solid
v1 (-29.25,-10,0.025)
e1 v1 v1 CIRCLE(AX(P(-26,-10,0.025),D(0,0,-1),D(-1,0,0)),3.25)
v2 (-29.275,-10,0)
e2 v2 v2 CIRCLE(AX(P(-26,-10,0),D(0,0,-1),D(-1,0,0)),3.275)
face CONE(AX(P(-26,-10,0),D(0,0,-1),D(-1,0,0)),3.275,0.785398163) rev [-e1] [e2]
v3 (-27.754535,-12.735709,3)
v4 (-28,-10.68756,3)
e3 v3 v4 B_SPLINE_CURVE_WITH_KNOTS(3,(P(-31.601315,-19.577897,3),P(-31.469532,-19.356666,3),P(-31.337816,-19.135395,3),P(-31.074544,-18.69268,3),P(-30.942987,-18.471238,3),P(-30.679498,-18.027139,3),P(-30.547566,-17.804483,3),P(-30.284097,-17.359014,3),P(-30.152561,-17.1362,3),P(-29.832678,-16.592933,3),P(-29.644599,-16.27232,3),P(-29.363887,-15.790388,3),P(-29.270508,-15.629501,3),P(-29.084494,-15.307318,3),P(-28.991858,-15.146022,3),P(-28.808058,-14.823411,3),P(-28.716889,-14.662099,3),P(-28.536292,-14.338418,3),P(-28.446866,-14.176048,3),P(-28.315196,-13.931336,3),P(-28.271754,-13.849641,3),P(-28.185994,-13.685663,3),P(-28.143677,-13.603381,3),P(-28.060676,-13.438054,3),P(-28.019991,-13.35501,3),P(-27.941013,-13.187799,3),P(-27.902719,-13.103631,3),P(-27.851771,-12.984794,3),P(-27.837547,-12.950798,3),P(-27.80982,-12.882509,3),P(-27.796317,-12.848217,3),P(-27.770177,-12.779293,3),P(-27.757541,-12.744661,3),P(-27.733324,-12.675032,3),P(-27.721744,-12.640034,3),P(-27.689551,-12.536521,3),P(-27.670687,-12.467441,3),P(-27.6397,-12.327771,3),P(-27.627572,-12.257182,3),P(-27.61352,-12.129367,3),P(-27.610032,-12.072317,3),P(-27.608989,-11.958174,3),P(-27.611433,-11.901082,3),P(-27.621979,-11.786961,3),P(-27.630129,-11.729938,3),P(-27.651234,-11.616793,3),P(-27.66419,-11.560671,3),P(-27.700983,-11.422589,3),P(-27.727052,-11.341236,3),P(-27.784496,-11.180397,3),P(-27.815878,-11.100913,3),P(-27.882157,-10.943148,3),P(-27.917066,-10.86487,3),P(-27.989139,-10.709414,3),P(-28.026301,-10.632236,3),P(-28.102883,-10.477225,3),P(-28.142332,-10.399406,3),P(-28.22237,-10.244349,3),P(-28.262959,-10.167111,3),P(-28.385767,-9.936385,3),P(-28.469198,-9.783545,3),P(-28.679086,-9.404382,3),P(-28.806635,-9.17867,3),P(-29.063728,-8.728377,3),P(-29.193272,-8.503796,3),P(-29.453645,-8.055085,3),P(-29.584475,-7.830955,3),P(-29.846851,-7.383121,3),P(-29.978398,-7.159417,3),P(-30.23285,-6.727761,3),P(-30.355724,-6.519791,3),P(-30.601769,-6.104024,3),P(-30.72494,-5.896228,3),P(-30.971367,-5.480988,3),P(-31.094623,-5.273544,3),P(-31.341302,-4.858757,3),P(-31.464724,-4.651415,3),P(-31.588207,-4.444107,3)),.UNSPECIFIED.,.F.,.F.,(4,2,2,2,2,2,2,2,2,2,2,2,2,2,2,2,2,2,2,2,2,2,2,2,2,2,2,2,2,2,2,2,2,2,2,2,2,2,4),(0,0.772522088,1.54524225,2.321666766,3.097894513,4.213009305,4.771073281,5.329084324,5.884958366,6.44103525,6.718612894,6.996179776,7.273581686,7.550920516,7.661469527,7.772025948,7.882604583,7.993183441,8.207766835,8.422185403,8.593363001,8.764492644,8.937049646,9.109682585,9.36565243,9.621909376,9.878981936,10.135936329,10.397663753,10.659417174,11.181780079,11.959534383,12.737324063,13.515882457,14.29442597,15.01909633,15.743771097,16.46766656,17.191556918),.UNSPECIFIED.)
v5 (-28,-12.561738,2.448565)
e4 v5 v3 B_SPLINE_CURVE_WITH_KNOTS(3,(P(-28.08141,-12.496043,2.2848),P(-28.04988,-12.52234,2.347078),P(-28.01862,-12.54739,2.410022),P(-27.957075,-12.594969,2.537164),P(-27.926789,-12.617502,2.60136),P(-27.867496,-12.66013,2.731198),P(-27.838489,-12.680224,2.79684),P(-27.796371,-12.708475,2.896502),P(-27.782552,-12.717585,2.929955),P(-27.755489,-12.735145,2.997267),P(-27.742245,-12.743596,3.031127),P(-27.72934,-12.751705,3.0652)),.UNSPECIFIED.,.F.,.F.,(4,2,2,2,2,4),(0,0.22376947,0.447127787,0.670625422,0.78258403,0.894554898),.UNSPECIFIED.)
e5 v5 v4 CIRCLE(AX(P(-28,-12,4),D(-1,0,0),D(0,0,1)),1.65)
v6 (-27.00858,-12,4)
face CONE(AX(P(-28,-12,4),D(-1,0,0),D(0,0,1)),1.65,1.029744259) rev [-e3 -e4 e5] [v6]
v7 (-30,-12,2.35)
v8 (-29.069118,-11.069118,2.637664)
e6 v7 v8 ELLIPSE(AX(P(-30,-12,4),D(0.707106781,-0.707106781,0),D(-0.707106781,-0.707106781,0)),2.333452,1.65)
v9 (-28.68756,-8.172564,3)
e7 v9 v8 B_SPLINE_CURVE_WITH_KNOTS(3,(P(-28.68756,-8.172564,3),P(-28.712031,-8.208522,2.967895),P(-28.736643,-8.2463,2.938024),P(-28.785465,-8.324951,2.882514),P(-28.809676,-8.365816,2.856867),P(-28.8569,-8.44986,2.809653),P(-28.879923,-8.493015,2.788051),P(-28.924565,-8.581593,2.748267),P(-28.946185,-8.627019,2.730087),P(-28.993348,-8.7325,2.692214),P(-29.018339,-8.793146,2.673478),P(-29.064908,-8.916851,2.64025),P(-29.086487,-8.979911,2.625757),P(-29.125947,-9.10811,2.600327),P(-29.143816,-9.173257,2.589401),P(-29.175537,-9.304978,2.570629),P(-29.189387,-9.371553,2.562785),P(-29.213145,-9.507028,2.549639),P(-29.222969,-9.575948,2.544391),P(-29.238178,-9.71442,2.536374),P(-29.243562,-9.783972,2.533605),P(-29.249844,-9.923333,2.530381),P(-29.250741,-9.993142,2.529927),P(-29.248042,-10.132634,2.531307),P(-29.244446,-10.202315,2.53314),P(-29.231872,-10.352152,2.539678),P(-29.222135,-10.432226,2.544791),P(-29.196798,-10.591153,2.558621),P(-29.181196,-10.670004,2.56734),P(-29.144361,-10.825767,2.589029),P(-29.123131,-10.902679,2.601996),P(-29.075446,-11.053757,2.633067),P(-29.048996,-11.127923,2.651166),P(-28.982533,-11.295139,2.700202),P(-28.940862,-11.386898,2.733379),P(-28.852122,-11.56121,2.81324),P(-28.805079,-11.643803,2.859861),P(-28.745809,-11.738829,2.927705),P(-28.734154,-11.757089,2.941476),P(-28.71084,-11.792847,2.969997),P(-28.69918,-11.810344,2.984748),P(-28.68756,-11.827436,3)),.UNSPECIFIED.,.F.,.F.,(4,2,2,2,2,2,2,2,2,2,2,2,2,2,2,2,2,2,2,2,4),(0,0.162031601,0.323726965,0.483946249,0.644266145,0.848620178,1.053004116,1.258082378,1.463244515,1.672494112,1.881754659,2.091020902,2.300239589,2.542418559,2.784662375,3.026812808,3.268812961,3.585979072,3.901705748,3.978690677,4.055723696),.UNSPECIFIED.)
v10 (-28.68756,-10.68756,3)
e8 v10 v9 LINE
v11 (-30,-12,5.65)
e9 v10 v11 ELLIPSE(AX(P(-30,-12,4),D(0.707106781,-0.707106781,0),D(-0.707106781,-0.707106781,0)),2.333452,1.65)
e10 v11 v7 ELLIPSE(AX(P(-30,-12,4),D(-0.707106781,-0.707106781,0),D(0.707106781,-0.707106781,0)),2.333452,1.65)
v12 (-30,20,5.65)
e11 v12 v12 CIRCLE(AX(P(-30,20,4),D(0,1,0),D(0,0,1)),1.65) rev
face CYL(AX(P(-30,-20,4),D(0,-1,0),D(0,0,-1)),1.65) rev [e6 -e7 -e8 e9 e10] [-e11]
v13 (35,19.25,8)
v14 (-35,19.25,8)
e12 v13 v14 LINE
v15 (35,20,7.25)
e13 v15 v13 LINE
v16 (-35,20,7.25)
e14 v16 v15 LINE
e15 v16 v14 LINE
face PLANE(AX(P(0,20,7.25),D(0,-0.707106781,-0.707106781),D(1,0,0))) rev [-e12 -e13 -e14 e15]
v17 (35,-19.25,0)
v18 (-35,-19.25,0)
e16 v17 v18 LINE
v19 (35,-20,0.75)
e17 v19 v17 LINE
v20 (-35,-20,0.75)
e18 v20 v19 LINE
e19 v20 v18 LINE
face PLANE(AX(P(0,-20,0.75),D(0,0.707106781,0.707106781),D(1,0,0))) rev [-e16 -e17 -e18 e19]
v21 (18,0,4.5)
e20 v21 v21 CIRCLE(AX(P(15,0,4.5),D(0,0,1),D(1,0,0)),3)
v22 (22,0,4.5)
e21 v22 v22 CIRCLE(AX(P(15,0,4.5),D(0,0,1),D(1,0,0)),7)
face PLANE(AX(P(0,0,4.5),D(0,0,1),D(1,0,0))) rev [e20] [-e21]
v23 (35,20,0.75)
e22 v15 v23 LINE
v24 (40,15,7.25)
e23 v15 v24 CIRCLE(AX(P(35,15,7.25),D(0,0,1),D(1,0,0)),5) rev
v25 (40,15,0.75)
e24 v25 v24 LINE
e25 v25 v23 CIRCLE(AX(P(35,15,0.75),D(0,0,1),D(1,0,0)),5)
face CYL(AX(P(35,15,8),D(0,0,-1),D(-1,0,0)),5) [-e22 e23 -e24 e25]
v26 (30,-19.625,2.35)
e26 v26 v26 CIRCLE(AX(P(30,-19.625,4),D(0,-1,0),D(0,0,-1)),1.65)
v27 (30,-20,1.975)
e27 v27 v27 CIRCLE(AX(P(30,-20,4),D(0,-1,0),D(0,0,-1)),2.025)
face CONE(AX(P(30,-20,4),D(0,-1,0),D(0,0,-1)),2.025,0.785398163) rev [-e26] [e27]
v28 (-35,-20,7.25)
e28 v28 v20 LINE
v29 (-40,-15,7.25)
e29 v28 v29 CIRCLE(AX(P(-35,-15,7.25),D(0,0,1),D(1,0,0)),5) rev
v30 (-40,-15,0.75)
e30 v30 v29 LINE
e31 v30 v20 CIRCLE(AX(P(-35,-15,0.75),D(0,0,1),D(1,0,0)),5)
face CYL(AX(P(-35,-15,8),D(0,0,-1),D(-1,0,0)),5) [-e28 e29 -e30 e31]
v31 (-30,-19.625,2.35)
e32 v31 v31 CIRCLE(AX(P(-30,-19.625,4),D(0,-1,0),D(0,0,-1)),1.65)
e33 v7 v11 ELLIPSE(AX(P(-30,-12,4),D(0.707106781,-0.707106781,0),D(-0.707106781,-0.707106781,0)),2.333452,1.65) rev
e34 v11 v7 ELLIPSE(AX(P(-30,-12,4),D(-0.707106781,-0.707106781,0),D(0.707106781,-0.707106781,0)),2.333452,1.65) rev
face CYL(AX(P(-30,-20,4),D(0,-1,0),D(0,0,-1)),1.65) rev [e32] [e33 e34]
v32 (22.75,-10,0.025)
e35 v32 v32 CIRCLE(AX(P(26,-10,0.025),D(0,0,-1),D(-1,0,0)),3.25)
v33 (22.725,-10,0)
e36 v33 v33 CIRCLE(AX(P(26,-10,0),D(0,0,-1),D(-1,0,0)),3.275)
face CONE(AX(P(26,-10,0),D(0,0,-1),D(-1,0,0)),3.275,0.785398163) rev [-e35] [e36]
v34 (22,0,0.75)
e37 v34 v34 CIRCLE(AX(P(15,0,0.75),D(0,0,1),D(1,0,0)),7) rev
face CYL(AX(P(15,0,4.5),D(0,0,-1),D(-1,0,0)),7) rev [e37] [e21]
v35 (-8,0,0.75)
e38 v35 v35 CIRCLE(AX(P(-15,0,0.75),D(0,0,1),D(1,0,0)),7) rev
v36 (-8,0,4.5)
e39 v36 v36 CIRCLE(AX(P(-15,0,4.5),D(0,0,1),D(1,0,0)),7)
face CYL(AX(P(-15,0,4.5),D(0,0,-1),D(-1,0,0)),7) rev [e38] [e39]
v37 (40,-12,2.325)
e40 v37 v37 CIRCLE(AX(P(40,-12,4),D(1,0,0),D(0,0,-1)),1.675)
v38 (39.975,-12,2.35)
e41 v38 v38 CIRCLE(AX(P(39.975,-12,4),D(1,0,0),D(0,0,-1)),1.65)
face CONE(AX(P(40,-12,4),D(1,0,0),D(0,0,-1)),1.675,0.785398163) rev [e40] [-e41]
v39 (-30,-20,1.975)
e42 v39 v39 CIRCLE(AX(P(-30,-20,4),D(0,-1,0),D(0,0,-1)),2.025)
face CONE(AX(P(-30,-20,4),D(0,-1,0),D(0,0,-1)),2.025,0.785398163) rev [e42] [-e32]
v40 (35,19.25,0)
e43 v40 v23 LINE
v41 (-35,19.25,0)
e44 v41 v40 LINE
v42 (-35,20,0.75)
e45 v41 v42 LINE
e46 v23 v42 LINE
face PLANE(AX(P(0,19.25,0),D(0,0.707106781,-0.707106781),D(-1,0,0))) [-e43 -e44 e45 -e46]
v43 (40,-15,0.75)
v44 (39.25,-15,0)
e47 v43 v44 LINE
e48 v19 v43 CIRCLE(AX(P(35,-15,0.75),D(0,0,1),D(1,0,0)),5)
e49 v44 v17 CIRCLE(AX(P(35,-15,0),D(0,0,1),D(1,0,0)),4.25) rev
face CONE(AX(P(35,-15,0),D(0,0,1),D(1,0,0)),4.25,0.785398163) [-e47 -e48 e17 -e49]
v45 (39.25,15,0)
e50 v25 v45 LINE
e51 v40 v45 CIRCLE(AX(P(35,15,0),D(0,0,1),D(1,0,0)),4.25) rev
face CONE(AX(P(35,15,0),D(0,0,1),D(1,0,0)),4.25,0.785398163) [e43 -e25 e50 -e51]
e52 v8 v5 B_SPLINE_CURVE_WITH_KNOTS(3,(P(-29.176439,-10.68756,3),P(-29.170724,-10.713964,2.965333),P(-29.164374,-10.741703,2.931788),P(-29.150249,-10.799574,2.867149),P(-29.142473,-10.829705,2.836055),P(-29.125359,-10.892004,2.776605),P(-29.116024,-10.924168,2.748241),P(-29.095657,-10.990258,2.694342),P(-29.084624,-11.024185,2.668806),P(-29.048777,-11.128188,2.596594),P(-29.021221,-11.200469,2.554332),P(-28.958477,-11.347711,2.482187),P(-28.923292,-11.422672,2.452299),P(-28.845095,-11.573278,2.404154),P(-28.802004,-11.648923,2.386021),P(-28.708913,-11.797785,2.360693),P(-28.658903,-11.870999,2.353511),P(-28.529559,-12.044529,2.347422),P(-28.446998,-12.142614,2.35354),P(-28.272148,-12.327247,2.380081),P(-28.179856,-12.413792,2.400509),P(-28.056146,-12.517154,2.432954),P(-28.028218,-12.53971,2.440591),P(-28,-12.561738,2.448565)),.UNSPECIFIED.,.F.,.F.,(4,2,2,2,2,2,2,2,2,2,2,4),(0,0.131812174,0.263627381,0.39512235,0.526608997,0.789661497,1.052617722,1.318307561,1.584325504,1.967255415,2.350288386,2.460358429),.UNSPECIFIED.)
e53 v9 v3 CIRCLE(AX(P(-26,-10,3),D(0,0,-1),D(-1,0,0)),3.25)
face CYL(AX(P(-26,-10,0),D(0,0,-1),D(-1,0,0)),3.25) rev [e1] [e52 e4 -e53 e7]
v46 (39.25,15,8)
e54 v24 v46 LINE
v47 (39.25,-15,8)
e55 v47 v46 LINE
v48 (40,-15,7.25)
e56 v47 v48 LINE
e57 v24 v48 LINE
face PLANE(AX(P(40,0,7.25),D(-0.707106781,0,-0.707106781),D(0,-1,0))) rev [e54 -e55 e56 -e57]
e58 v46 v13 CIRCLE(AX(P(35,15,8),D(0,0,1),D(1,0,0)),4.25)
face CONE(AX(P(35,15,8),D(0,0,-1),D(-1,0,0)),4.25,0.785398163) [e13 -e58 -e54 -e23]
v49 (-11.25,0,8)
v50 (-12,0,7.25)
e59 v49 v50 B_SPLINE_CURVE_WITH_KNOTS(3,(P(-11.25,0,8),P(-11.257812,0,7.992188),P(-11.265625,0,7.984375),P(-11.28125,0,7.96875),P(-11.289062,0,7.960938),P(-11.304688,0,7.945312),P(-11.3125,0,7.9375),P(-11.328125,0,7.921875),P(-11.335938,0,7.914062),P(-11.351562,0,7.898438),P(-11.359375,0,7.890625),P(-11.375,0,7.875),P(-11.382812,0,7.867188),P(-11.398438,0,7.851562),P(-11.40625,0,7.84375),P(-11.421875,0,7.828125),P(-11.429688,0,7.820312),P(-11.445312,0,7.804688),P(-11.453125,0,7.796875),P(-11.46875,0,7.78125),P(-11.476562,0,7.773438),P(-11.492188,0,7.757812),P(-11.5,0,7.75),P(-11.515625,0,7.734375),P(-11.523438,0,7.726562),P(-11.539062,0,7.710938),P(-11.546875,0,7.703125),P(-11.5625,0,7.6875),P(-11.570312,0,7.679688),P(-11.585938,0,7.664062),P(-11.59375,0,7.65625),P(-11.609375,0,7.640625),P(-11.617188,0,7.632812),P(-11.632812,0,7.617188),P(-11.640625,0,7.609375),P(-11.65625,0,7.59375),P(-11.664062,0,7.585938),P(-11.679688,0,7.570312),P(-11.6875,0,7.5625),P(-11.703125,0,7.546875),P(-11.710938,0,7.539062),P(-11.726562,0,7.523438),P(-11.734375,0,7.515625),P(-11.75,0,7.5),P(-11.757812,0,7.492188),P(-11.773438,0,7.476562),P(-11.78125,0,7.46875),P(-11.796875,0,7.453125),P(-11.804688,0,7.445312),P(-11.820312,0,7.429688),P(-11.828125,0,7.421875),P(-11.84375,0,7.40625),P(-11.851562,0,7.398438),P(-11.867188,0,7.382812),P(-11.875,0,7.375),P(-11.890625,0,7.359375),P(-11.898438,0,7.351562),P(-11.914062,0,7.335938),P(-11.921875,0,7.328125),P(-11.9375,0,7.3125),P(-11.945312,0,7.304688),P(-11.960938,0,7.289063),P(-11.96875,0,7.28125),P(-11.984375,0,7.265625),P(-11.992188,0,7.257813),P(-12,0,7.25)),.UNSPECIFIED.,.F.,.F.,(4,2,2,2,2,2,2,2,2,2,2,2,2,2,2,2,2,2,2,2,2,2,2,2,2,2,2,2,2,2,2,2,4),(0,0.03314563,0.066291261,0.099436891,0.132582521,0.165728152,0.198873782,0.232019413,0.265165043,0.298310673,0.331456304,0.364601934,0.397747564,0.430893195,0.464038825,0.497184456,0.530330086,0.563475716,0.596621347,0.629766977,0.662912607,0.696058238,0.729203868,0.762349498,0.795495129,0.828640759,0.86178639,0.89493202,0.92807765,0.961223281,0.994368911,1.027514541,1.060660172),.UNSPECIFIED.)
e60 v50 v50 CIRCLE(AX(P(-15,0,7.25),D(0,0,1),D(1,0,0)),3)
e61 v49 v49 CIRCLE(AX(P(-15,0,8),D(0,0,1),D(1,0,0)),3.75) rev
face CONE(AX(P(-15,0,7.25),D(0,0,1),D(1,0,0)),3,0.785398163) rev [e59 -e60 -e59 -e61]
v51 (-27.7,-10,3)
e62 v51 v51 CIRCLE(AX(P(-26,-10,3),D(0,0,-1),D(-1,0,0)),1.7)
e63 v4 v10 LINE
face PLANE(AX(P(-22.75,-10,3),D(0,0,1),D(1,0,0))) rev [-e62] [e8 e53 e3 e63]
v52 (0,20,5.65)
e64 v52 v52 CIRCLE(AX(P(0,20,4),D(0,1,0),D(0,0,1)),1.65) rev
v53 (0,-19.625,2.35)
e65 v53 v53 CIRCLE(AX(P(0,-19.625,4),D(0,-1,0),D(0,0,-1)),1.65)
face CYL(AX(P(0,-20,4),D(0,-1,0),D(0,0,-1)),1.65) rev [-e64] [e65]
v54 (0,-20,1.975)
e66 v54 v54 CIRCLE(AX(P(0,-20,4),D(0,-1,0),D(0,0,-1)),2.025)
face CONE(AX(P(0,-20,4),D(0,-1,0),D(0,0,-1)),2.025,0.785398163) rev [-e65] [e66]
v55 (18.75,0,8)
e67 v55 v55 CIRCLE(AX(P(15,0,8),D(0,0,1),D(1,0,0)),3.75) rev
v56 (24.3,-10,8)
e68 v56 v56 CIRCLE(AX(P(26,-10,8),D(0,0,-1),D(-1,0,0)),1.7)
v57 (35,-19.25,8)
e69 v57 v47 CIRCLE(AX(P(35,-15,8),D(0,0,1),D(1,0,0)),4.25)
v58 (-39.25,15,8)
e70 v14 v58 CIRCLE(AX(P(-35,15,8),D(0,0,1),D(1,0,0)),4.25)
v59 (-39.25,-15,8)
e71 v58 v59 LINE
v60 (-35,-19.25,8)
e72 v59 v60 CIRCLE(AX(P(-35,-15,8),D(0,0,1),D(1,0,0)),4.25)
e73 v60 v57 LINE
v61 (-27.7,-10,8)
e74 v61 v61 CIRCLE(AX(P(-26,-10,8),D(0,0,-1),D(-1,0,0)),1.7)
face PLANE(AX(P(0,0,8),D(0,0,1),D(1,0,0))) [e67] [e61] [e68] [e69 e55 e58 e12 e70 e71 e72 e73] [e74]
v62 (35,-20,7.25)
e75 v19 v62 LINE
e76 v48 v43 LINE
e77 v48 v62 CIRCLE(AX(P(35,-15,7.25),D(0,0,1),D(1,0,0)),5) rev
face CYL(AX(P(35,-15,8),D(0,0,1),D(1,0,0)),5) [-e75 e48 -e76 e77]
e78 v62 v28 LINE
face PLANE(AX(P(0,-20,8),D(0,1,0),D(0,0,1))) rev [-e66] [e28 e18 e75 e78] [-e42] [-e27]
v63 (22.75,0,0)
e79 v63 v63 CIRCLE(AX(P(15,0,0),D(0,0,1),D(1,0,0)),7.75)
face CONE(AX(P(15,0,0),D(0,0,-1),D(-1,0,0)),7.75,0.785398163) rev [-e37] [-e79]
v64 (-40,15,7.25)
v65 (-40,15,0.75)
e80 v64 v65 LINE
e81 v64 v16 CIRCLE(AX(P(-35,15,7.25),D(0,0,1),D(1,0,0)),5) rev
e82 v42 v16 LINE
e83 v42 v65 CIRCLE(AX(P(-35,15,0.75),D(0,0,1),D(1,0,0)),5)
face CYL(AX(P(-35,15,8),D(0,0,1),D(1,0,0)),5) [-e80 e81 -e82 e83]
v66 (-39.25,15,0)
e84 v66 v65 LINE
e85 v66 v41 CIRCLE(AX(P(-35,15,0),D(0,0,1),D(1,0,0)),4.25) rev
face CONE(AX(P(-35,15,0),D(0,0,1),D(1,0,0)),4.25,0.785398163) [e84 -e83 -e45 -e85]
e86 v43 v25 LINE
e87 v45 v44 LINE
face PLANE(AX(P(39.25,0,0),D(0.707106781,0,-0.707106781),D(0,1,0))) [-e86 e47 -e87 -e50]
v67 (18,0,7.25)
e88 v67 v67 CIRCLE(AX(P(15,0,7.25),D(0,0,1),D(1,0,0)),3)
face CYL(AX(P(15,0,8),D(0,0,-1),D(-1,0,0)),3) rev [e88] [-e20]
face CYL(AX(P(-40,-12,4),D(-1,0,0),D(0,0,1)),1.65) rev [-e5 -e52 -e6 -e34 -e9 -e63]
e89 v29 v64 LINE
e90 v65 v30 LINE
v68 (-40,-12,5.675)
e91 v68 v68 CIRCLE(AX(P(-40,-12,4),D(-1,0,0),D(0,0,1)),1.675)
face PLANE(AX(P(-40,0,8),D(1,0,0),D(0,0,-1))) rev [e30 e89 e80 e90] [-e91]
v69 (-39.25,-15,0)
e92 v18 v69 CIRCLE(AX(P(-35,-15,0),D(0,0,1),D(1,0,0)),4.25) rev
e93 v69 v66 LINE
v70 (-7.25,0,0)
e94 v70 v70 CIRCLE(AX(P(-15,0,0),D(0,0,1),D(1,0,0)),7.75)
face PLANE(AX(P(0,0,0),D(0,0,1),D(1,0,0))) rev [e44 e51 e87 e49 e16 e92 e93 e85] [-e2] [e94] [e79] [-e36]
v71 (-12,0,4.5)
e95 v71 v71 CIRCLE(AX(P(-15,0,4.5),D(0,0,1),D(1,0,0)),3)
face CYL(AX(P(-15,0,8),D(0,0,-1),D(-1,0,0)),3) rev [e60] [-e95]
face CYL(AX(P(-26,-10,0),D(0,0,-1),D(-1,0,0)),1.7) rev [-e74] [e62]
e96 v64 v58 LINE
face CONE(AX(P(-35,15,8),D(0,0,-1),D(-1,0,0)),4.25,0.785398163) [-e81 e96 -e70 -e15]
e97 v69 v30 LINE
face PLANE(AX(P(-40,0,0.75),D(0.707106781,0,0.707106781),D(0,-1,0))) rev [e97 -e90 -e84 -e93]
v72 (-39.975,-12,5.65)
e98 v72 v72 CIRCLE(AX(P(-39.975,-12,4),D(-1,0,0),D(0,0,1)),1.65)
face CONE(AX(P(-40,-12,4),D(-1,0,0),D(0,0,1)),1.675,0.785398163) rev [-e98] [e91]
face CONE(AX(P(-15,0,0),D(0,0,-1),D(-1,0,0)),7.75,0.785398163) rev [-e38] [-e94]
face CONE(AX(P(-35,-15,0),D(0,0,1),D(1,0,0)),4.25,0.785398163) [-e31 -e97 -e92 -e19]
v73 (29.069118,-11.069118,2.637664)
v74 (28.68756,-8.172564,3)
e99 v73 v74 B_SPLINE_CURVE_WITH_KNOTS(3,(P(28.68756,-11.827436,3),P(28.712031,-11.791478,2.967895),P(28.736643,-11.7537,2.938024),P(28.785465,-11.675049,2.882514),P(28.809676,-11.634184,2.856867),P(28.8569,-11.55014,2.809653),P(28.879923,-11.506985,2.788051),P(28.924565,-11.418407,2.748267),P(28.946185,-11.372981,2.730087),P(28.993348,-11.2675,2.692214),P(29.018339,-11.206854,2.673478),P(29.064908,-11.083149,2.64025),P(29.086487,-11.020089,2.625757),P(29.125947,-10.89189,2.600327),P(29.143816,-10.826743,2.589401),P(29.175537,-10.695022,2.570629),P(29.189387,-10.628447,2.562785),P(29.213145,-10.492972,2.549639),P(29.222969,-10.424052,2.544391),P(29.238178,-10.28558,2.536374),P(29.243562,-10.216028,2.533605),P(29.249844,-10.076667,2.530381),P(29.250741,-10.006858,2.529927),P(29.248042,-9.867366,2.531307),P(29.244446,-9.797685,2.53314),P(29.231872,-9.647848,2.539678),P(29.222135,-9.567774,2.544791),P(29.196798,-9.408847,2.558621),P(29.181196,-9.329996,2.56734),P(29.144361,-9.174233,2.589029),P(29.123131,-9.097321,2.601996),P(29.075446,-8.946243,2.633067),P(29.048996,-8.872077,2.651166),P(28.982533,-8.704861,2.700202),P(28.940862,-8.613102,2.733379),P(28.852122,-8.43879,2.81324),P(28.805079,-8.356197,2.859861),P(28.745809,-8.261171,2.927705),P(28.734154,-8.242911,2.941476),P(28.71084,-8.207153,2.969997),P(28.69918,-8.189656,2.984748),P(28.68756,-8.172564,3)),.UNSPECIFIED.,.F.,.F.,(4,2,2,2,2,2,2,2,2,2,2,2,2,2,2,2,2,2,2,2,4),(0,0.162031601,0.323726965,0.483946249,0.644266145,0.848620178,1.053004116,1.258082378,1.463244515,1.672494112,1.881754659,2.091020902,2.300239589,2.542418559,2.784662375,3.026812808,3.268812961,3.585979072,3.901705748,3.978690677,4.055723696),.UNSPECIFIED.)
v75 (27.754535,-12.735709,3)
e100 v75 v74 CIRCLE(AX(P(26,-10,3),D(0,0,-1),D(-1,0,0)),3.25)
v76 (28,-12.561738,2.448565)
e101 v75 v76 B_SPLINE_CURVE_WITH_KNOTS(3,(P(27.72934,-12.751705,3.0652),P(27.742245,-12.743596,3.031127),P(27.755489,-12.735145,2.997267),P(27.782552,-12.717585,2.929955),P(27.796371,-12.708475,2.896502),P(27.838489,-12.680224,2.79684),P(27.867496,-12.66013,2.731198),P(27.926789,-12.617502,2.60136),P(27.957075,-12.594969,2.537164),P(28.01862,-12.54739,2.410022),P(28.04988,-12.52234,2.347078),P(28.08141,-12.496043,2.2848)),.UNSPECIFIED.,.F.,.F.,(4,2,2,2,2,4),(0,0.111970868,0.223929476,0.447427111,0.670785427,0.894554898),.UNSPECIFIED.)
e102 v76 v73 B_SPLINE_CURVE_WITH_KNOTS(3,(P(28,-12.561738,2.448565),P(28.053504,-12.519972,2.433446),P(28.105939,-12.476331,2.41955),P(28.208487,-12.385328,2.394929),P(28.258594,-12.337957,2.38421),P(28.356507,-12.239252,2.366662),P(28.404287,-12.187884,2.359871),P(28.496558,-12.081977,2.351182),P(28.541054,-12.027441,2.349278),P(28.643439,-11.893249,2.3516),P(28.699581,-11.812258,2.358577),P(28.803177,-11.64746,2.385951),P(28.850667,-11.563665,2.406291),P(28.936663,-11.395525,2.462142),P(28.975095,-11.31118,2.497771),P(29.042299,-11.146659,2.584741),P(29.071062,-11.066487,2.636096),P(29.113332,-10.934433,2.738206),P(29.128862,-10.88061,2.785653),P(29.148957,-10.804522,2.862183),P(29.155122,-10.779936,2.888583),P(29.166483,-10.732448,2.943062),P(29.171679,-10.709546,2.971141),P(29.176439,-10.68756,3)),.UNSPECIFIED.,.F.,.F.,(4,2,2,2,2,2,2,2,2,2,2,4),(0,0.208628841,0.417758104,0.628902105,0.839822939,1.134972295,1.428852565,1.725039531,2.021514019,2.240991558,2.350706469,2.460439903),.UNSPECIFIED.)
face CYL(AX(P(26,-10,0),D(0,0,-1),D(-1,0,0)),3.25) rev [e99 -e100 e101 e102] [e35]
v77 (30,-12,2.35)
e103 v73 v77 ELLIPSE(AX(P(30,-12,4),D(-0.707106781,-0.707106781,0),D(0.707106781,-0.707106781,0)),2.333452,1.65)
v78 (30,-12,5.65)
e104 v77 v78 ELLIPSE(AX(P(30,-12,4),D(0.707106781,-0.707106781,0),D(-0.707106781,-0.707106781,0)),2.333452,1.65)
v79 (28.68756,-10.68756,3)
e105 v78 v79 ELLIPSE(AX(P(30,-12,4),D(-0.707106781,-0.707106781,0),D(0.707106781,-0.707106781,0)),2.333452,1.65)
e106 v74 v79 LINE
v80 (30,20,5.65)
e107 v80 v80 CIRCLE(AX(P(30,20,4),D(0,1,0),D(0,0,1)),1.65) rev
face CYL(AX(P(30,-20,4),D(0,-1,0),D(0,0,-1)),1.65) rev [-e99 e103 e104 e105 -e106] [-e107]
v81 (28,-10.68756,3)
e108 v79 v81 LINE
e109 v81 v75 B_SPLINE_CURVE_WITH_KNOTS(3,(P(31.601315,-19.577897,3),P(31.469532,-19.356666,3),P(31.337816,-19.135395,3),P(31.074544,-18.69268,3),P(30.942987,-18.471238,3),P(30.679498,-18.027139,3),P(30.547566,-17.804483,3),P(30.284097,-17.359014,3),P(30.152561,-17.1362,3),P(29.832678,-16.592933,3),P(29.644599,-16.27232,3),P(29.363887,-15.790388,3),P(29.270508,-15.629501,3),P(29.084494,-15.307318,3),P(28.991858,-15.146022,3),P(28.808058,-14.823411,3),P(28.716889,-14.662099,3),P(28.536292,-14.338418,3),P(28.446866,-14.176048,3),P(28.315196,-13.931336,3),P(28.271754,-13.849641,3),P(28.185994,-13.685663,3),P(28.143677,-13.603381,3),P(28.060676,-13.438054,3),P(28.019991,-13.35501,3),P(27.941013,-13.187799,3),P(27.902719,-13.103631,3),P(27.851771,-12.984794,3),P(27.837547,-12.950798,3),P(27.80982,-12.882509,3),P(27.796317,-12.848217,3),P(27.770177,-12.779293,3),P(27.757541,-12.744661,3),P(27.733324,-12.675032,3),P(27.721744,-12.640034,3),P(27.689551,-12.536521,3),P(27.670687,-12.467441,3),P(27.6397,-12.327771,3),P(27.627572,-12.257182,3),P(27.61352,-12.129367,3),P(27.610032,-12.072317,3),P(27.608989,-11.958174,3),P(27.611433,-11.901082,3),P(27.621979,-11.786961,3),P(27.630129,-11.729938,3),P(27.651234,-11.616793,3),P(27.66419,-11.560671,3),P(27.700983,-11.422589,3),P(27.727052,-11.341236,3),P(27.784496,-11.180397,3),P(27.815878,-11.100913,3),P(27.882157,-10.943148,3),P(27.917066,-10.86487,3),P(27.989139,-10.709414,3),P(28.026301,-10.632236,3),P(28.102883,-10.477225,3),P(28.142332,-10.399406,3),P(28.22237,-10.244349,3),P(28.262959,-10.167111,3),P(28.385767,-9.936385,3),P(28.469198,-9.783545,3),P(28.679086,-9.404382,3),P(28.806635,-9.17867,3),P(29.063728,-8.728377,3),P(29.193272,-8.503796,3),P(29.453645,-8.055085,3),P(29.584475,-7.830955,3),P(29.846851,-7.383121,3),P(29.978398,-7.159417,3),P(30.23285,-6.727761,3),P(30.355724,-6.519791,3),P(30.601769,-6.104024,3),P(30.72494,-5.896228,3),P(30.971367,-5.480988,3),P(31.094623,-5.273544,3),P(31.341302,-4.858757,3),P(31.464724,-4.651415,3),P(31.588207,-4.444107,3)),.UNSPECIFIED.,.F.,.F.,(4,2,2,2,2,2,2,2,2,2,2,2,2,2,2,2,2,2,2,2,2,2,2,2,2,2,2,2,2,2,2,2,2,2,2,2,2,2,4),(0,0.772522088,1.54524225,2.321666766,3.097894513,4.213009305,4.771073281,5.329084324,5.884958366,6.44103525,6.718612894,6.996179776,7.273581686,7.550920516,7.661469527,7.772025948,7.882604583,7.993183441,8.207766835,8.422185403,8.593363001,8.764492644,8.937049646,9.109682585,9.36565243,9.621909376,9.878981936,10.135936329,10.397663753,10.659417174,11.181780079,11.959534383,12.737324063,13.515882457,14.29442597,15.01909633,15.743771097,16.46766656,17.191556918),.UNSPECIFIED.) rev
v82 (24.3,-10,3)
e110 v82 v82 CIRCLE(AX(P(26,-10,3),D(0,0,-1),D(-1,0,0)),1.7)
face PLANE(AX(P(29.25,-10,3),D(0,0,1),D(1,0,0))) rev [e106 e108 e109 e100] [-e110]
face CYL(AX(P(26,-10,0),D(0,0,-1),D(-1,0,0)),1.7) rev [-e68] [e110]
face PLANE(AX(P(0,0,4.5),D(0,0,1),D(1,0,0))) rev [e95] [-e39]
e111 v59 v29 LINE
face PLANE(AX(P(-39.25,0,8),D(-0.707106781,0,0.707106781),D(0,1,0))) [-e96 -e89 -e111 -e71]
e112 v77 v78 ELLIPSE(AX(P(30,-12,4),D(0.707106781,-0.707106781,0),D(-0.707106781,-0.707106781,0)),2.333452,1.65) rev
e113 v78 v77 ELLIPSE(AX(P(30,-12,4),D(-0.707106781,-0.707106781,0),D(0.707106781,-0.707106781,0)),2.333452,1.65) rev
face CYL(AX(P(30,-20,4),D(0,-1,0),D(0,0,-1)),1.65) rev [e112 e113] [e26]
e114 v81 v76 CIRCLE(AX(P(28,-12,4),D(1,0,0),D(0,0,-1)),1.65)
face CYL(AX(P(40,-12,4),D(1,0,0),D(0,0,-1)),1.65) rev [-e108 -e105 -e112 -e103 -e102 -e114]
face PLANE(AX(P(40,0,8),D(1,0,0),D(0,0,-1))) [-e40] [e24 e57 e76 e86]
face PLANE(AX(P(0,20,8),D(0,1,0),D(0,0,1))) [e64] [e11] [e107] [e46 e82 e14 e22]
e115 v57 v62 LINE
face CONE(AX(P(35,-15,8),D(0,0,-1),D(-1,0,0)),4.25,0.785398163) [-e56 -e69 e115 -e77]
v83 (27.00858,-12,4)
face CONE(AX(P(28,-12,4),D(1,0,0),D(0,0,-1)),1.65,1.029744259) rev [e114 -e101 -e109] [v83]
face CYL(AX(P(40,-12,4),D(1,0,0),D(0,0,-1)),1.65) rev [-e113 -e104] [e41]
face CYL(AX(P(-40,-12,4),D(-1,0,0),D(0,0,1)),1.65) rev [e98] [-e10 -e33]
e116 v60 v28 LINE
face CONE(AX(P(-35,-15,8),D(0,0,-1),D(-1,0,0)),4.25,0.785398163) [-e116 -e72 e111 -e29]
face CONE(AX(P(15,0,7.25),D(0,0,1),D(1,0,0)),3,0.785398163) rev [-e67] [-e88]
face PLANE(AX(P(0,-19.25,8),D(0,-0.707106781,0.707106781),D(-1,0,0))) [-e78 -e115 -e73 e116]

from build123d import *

# Parameters (mm, degrees)
SKETCH1_W                       = 80
SKETCH1_H                       = 40
SKETCH1_R                       = 7
SKETCH1_R_2                     = 3
BOSS_EXTRUDE1_DEPTH             = 8
CUT_EXTRUDE1_OUTLINE_R          = 7
CUT_EXTRUDE1_OUTLINE_R_2        = 3
CUT_EXTRUDE1_DEPTH              = 4.5
FILLET1_R                       = 5
CBORE_FOR_M3_SHCS1_AT_2_COUNT   = 2
CBORE_FOR_M3_SHCS1_AT_2_PITCH   = 52
M4X0_7_TAPPED_HOLE4_D           = 3.3
M4X0_7_TAPPED_HOLE4_DEPTH       = 40
M4X0_7_TAPPED_HOLE4_CSINK_D     = 4.05
M4X0_7_TAPPED_HOLE4_CSINK_ANGLE = 90
M4X0_7_TAPPED_HOLE4_TIP         = 0.991420021
CHAMFER1_SIZE                   = 0.75


# Read off the part's stored shape, not the designer's step: Cut-Extrude1
with BuildPart() as part:
    # Sketch1 → Boss-Extrude1 (new body)
    # profile 1 of 3: a face of its own
    with BuildSketch(Plane.XY):
        Rectangle(SKETCH1_W, SKETCH1_H)
        with Locations((15, 0)):
            Circle(SKETCH1_R, mode=Mode.SUBTRACT)
        with Locations((-15, 0)):
            Circle(SKETCH1_R, mode=Mode.SUBTRACT)
    # profile 2 of 3: a face of its own
    with BuildSketch(Plane.XY):
        with Locations((15, 0)):
            Circle(SKETCH1_R)
        with Locations((15, 0)):
            Circle(SKETCH1_R_2, mode=Mode.SUBTRACT)
    # profile 3 of 3: a face of its own
    with BuildSketch(Plane.XY):
        with Locations((-15, 0)):
            Circle(SKETCH1_R)
        with Locations((-15, 0)):
            Circle(SKETCH1_R_2, mode=Mode.SUBTRACT)
    extrude(amount=BOSS_EXTRUDE1_DEPTH)

    # Cut-Extrude1 outline → Cut-Extrude1 (cut)
    # profile 1 of 2: a face of its own
    with BuildSketch(Plane.XY):
        with Locations((15, 0)):
            Circle(CUT_EXTRUDE1_OUTLINE_R)
        with Locations((15, 0)):
            Circle(CUT_EXTRUDE1_OUTLINE_R_2, mode=Mode.SUBTRACT)
    # profile 2 of 2: a face of its own
    with BuildSketch(Plane.XY):
        with Locations((-15, 0)):
            Circle(CUT_EXTRUDE1_OUTLINE_R)
        with Locations((-15, 0)):
            Circle(CUT_EXTRUDE1_OUTLINE_R_2, mode=Mode.SUBTRACT)
    extrude(amount=CUT_EXTRUDE1_DEPTH, mode=Mode.SUBTRACT)

    # Fillet1
    fillet1_edges = [part.edges().sort_by_distance(p)[0] for p in [
        (40, -20, 4),
        (-40, -20, 4),
        (-40, 20, 4),
        (40, 20, 4),
    ]]
    fillet(fillet1_edges, radius=FILLET1_R)

    # Sketch2 → CBORE for M3 SHCS1 (revolve, cut)
    with BuildSketch(Plane(origin=(26, -10, 0), x_dir=(0, 1, 0), z_dir=(1, 0, 0))):
        Polygon((0, 0), (0, 8), (1.7, 8), (1.7, 3), (3.25, 3), (3.25, 0.025), (3.275, 0), align=None)
    cbore_for_m3_shcs1 = revolve(axis=Axis((26, -10, -6.35), (0, 0, 1)), mode=Mode.SUBTRACT)

    # CBORE for M3 SHCS1 at 2: CBORE for M3 SHCS1 ×2
    with Locations(*[(-i * CBORE_FOR_M3_SHCS1_AT_2_PITCH, 0, 0) for i in range(1, CBORE_FOR_M3_SHCS1_AT_2_COUNT)]):
        add(cbore_for_m3_shcs1, mode=Mode.SUBTRACT)

    # M4x0.7 Tapped Hole4
    with Locations(Plane(origin=(0, -20, 0), x_dir=(-1, 0, 0), z_dir=(0, -1, 0))):
        with Locations((0, -4), (30, -4), (-30, -4)):
            CounterSinkHole(M4X0_7_TAPPED_HOLE4_D / 2, M4X0_7_TAPPED_HOLE4_CSINK_D / 2, depth=M4X0_7_TAPPED_HOLE4_DEPTH, counter_sink_angle=M4X0_7_TAPPED_HOLE4_CSINK_ANGLE)
            with Locations((0, 0, -(M4X0_7_TAPPED_HOLE4_DEPTH + M4X0_7_TAPPED_HOLE4_TIP / 2))):  # 118° drill point
                Cone(0, M4X0_7_TAPPED_HOLE4_D / 2, M4X0_7_TAPPED_HOLE4_TIP, mode=Mode.SUBTRACT)

    # Sketch8 → Tap Drill for M4x0.7 Tap1 (revolve, cut)
    with BuildSketch(Plane(origin=(-40, -12, 4), x_dir=(0, 0, 1), z_dir=(0, 1, 0))):
        Polygon((0, 0), (0, 12.991420021), (1.65, 12), (1.65, 0.025), (1.675, 0), align=None)
    tap_drill_for_m4x0_7_tap1 = revolve(axis=Axis((-46.35, -12, 4), (1, 0, 0)), mode=Mode.SUBTRACT)

    # Mirror1: Tap Drill for M4x0.7 Tap1 across plane
    add(tap_drill_for_m4x0_7_tap1.mirror(Plane(origin=(0, 0, 0), x_dir=(0, 0, 1), z_dir=(1, 0, 0))), mode=Mode.SUBTRACT)

    # Chamfer1
    chamfer1_edges = [part.edges().sort_by_distance(p)[0] for p in [
        (-22, 0, 0),
        (-18, 0, 8),
        (8, 0, 0),
        (12, 0, 8),
        (40, 0, 0),
        (40, 0, 8),
        (0, -20, 0),
        (-40, 0, 0),
        (0, 20, 0),
        (38.535533906, 18.535533906, 0),
        (-38.535533906, 18.535533906, 0),
        (-38.535533906, -18.535533906, 0),
        (38.535533906, -18.535533906, 0),
        (0, -20, 8),
        (0, 20, 8),
        (-40, 0, 8),
        (38.535533906, 18.535533906, 8),
        (-38.535533906, 18.535533906, 8),
        (-38.535533906, -18.535533906, 8),
        (38.535533906, -18.535533906, 8),
    ]]
    chamfer(chamfer1_edges, length=CHAMFER1_SIZE)


solid = part.part
